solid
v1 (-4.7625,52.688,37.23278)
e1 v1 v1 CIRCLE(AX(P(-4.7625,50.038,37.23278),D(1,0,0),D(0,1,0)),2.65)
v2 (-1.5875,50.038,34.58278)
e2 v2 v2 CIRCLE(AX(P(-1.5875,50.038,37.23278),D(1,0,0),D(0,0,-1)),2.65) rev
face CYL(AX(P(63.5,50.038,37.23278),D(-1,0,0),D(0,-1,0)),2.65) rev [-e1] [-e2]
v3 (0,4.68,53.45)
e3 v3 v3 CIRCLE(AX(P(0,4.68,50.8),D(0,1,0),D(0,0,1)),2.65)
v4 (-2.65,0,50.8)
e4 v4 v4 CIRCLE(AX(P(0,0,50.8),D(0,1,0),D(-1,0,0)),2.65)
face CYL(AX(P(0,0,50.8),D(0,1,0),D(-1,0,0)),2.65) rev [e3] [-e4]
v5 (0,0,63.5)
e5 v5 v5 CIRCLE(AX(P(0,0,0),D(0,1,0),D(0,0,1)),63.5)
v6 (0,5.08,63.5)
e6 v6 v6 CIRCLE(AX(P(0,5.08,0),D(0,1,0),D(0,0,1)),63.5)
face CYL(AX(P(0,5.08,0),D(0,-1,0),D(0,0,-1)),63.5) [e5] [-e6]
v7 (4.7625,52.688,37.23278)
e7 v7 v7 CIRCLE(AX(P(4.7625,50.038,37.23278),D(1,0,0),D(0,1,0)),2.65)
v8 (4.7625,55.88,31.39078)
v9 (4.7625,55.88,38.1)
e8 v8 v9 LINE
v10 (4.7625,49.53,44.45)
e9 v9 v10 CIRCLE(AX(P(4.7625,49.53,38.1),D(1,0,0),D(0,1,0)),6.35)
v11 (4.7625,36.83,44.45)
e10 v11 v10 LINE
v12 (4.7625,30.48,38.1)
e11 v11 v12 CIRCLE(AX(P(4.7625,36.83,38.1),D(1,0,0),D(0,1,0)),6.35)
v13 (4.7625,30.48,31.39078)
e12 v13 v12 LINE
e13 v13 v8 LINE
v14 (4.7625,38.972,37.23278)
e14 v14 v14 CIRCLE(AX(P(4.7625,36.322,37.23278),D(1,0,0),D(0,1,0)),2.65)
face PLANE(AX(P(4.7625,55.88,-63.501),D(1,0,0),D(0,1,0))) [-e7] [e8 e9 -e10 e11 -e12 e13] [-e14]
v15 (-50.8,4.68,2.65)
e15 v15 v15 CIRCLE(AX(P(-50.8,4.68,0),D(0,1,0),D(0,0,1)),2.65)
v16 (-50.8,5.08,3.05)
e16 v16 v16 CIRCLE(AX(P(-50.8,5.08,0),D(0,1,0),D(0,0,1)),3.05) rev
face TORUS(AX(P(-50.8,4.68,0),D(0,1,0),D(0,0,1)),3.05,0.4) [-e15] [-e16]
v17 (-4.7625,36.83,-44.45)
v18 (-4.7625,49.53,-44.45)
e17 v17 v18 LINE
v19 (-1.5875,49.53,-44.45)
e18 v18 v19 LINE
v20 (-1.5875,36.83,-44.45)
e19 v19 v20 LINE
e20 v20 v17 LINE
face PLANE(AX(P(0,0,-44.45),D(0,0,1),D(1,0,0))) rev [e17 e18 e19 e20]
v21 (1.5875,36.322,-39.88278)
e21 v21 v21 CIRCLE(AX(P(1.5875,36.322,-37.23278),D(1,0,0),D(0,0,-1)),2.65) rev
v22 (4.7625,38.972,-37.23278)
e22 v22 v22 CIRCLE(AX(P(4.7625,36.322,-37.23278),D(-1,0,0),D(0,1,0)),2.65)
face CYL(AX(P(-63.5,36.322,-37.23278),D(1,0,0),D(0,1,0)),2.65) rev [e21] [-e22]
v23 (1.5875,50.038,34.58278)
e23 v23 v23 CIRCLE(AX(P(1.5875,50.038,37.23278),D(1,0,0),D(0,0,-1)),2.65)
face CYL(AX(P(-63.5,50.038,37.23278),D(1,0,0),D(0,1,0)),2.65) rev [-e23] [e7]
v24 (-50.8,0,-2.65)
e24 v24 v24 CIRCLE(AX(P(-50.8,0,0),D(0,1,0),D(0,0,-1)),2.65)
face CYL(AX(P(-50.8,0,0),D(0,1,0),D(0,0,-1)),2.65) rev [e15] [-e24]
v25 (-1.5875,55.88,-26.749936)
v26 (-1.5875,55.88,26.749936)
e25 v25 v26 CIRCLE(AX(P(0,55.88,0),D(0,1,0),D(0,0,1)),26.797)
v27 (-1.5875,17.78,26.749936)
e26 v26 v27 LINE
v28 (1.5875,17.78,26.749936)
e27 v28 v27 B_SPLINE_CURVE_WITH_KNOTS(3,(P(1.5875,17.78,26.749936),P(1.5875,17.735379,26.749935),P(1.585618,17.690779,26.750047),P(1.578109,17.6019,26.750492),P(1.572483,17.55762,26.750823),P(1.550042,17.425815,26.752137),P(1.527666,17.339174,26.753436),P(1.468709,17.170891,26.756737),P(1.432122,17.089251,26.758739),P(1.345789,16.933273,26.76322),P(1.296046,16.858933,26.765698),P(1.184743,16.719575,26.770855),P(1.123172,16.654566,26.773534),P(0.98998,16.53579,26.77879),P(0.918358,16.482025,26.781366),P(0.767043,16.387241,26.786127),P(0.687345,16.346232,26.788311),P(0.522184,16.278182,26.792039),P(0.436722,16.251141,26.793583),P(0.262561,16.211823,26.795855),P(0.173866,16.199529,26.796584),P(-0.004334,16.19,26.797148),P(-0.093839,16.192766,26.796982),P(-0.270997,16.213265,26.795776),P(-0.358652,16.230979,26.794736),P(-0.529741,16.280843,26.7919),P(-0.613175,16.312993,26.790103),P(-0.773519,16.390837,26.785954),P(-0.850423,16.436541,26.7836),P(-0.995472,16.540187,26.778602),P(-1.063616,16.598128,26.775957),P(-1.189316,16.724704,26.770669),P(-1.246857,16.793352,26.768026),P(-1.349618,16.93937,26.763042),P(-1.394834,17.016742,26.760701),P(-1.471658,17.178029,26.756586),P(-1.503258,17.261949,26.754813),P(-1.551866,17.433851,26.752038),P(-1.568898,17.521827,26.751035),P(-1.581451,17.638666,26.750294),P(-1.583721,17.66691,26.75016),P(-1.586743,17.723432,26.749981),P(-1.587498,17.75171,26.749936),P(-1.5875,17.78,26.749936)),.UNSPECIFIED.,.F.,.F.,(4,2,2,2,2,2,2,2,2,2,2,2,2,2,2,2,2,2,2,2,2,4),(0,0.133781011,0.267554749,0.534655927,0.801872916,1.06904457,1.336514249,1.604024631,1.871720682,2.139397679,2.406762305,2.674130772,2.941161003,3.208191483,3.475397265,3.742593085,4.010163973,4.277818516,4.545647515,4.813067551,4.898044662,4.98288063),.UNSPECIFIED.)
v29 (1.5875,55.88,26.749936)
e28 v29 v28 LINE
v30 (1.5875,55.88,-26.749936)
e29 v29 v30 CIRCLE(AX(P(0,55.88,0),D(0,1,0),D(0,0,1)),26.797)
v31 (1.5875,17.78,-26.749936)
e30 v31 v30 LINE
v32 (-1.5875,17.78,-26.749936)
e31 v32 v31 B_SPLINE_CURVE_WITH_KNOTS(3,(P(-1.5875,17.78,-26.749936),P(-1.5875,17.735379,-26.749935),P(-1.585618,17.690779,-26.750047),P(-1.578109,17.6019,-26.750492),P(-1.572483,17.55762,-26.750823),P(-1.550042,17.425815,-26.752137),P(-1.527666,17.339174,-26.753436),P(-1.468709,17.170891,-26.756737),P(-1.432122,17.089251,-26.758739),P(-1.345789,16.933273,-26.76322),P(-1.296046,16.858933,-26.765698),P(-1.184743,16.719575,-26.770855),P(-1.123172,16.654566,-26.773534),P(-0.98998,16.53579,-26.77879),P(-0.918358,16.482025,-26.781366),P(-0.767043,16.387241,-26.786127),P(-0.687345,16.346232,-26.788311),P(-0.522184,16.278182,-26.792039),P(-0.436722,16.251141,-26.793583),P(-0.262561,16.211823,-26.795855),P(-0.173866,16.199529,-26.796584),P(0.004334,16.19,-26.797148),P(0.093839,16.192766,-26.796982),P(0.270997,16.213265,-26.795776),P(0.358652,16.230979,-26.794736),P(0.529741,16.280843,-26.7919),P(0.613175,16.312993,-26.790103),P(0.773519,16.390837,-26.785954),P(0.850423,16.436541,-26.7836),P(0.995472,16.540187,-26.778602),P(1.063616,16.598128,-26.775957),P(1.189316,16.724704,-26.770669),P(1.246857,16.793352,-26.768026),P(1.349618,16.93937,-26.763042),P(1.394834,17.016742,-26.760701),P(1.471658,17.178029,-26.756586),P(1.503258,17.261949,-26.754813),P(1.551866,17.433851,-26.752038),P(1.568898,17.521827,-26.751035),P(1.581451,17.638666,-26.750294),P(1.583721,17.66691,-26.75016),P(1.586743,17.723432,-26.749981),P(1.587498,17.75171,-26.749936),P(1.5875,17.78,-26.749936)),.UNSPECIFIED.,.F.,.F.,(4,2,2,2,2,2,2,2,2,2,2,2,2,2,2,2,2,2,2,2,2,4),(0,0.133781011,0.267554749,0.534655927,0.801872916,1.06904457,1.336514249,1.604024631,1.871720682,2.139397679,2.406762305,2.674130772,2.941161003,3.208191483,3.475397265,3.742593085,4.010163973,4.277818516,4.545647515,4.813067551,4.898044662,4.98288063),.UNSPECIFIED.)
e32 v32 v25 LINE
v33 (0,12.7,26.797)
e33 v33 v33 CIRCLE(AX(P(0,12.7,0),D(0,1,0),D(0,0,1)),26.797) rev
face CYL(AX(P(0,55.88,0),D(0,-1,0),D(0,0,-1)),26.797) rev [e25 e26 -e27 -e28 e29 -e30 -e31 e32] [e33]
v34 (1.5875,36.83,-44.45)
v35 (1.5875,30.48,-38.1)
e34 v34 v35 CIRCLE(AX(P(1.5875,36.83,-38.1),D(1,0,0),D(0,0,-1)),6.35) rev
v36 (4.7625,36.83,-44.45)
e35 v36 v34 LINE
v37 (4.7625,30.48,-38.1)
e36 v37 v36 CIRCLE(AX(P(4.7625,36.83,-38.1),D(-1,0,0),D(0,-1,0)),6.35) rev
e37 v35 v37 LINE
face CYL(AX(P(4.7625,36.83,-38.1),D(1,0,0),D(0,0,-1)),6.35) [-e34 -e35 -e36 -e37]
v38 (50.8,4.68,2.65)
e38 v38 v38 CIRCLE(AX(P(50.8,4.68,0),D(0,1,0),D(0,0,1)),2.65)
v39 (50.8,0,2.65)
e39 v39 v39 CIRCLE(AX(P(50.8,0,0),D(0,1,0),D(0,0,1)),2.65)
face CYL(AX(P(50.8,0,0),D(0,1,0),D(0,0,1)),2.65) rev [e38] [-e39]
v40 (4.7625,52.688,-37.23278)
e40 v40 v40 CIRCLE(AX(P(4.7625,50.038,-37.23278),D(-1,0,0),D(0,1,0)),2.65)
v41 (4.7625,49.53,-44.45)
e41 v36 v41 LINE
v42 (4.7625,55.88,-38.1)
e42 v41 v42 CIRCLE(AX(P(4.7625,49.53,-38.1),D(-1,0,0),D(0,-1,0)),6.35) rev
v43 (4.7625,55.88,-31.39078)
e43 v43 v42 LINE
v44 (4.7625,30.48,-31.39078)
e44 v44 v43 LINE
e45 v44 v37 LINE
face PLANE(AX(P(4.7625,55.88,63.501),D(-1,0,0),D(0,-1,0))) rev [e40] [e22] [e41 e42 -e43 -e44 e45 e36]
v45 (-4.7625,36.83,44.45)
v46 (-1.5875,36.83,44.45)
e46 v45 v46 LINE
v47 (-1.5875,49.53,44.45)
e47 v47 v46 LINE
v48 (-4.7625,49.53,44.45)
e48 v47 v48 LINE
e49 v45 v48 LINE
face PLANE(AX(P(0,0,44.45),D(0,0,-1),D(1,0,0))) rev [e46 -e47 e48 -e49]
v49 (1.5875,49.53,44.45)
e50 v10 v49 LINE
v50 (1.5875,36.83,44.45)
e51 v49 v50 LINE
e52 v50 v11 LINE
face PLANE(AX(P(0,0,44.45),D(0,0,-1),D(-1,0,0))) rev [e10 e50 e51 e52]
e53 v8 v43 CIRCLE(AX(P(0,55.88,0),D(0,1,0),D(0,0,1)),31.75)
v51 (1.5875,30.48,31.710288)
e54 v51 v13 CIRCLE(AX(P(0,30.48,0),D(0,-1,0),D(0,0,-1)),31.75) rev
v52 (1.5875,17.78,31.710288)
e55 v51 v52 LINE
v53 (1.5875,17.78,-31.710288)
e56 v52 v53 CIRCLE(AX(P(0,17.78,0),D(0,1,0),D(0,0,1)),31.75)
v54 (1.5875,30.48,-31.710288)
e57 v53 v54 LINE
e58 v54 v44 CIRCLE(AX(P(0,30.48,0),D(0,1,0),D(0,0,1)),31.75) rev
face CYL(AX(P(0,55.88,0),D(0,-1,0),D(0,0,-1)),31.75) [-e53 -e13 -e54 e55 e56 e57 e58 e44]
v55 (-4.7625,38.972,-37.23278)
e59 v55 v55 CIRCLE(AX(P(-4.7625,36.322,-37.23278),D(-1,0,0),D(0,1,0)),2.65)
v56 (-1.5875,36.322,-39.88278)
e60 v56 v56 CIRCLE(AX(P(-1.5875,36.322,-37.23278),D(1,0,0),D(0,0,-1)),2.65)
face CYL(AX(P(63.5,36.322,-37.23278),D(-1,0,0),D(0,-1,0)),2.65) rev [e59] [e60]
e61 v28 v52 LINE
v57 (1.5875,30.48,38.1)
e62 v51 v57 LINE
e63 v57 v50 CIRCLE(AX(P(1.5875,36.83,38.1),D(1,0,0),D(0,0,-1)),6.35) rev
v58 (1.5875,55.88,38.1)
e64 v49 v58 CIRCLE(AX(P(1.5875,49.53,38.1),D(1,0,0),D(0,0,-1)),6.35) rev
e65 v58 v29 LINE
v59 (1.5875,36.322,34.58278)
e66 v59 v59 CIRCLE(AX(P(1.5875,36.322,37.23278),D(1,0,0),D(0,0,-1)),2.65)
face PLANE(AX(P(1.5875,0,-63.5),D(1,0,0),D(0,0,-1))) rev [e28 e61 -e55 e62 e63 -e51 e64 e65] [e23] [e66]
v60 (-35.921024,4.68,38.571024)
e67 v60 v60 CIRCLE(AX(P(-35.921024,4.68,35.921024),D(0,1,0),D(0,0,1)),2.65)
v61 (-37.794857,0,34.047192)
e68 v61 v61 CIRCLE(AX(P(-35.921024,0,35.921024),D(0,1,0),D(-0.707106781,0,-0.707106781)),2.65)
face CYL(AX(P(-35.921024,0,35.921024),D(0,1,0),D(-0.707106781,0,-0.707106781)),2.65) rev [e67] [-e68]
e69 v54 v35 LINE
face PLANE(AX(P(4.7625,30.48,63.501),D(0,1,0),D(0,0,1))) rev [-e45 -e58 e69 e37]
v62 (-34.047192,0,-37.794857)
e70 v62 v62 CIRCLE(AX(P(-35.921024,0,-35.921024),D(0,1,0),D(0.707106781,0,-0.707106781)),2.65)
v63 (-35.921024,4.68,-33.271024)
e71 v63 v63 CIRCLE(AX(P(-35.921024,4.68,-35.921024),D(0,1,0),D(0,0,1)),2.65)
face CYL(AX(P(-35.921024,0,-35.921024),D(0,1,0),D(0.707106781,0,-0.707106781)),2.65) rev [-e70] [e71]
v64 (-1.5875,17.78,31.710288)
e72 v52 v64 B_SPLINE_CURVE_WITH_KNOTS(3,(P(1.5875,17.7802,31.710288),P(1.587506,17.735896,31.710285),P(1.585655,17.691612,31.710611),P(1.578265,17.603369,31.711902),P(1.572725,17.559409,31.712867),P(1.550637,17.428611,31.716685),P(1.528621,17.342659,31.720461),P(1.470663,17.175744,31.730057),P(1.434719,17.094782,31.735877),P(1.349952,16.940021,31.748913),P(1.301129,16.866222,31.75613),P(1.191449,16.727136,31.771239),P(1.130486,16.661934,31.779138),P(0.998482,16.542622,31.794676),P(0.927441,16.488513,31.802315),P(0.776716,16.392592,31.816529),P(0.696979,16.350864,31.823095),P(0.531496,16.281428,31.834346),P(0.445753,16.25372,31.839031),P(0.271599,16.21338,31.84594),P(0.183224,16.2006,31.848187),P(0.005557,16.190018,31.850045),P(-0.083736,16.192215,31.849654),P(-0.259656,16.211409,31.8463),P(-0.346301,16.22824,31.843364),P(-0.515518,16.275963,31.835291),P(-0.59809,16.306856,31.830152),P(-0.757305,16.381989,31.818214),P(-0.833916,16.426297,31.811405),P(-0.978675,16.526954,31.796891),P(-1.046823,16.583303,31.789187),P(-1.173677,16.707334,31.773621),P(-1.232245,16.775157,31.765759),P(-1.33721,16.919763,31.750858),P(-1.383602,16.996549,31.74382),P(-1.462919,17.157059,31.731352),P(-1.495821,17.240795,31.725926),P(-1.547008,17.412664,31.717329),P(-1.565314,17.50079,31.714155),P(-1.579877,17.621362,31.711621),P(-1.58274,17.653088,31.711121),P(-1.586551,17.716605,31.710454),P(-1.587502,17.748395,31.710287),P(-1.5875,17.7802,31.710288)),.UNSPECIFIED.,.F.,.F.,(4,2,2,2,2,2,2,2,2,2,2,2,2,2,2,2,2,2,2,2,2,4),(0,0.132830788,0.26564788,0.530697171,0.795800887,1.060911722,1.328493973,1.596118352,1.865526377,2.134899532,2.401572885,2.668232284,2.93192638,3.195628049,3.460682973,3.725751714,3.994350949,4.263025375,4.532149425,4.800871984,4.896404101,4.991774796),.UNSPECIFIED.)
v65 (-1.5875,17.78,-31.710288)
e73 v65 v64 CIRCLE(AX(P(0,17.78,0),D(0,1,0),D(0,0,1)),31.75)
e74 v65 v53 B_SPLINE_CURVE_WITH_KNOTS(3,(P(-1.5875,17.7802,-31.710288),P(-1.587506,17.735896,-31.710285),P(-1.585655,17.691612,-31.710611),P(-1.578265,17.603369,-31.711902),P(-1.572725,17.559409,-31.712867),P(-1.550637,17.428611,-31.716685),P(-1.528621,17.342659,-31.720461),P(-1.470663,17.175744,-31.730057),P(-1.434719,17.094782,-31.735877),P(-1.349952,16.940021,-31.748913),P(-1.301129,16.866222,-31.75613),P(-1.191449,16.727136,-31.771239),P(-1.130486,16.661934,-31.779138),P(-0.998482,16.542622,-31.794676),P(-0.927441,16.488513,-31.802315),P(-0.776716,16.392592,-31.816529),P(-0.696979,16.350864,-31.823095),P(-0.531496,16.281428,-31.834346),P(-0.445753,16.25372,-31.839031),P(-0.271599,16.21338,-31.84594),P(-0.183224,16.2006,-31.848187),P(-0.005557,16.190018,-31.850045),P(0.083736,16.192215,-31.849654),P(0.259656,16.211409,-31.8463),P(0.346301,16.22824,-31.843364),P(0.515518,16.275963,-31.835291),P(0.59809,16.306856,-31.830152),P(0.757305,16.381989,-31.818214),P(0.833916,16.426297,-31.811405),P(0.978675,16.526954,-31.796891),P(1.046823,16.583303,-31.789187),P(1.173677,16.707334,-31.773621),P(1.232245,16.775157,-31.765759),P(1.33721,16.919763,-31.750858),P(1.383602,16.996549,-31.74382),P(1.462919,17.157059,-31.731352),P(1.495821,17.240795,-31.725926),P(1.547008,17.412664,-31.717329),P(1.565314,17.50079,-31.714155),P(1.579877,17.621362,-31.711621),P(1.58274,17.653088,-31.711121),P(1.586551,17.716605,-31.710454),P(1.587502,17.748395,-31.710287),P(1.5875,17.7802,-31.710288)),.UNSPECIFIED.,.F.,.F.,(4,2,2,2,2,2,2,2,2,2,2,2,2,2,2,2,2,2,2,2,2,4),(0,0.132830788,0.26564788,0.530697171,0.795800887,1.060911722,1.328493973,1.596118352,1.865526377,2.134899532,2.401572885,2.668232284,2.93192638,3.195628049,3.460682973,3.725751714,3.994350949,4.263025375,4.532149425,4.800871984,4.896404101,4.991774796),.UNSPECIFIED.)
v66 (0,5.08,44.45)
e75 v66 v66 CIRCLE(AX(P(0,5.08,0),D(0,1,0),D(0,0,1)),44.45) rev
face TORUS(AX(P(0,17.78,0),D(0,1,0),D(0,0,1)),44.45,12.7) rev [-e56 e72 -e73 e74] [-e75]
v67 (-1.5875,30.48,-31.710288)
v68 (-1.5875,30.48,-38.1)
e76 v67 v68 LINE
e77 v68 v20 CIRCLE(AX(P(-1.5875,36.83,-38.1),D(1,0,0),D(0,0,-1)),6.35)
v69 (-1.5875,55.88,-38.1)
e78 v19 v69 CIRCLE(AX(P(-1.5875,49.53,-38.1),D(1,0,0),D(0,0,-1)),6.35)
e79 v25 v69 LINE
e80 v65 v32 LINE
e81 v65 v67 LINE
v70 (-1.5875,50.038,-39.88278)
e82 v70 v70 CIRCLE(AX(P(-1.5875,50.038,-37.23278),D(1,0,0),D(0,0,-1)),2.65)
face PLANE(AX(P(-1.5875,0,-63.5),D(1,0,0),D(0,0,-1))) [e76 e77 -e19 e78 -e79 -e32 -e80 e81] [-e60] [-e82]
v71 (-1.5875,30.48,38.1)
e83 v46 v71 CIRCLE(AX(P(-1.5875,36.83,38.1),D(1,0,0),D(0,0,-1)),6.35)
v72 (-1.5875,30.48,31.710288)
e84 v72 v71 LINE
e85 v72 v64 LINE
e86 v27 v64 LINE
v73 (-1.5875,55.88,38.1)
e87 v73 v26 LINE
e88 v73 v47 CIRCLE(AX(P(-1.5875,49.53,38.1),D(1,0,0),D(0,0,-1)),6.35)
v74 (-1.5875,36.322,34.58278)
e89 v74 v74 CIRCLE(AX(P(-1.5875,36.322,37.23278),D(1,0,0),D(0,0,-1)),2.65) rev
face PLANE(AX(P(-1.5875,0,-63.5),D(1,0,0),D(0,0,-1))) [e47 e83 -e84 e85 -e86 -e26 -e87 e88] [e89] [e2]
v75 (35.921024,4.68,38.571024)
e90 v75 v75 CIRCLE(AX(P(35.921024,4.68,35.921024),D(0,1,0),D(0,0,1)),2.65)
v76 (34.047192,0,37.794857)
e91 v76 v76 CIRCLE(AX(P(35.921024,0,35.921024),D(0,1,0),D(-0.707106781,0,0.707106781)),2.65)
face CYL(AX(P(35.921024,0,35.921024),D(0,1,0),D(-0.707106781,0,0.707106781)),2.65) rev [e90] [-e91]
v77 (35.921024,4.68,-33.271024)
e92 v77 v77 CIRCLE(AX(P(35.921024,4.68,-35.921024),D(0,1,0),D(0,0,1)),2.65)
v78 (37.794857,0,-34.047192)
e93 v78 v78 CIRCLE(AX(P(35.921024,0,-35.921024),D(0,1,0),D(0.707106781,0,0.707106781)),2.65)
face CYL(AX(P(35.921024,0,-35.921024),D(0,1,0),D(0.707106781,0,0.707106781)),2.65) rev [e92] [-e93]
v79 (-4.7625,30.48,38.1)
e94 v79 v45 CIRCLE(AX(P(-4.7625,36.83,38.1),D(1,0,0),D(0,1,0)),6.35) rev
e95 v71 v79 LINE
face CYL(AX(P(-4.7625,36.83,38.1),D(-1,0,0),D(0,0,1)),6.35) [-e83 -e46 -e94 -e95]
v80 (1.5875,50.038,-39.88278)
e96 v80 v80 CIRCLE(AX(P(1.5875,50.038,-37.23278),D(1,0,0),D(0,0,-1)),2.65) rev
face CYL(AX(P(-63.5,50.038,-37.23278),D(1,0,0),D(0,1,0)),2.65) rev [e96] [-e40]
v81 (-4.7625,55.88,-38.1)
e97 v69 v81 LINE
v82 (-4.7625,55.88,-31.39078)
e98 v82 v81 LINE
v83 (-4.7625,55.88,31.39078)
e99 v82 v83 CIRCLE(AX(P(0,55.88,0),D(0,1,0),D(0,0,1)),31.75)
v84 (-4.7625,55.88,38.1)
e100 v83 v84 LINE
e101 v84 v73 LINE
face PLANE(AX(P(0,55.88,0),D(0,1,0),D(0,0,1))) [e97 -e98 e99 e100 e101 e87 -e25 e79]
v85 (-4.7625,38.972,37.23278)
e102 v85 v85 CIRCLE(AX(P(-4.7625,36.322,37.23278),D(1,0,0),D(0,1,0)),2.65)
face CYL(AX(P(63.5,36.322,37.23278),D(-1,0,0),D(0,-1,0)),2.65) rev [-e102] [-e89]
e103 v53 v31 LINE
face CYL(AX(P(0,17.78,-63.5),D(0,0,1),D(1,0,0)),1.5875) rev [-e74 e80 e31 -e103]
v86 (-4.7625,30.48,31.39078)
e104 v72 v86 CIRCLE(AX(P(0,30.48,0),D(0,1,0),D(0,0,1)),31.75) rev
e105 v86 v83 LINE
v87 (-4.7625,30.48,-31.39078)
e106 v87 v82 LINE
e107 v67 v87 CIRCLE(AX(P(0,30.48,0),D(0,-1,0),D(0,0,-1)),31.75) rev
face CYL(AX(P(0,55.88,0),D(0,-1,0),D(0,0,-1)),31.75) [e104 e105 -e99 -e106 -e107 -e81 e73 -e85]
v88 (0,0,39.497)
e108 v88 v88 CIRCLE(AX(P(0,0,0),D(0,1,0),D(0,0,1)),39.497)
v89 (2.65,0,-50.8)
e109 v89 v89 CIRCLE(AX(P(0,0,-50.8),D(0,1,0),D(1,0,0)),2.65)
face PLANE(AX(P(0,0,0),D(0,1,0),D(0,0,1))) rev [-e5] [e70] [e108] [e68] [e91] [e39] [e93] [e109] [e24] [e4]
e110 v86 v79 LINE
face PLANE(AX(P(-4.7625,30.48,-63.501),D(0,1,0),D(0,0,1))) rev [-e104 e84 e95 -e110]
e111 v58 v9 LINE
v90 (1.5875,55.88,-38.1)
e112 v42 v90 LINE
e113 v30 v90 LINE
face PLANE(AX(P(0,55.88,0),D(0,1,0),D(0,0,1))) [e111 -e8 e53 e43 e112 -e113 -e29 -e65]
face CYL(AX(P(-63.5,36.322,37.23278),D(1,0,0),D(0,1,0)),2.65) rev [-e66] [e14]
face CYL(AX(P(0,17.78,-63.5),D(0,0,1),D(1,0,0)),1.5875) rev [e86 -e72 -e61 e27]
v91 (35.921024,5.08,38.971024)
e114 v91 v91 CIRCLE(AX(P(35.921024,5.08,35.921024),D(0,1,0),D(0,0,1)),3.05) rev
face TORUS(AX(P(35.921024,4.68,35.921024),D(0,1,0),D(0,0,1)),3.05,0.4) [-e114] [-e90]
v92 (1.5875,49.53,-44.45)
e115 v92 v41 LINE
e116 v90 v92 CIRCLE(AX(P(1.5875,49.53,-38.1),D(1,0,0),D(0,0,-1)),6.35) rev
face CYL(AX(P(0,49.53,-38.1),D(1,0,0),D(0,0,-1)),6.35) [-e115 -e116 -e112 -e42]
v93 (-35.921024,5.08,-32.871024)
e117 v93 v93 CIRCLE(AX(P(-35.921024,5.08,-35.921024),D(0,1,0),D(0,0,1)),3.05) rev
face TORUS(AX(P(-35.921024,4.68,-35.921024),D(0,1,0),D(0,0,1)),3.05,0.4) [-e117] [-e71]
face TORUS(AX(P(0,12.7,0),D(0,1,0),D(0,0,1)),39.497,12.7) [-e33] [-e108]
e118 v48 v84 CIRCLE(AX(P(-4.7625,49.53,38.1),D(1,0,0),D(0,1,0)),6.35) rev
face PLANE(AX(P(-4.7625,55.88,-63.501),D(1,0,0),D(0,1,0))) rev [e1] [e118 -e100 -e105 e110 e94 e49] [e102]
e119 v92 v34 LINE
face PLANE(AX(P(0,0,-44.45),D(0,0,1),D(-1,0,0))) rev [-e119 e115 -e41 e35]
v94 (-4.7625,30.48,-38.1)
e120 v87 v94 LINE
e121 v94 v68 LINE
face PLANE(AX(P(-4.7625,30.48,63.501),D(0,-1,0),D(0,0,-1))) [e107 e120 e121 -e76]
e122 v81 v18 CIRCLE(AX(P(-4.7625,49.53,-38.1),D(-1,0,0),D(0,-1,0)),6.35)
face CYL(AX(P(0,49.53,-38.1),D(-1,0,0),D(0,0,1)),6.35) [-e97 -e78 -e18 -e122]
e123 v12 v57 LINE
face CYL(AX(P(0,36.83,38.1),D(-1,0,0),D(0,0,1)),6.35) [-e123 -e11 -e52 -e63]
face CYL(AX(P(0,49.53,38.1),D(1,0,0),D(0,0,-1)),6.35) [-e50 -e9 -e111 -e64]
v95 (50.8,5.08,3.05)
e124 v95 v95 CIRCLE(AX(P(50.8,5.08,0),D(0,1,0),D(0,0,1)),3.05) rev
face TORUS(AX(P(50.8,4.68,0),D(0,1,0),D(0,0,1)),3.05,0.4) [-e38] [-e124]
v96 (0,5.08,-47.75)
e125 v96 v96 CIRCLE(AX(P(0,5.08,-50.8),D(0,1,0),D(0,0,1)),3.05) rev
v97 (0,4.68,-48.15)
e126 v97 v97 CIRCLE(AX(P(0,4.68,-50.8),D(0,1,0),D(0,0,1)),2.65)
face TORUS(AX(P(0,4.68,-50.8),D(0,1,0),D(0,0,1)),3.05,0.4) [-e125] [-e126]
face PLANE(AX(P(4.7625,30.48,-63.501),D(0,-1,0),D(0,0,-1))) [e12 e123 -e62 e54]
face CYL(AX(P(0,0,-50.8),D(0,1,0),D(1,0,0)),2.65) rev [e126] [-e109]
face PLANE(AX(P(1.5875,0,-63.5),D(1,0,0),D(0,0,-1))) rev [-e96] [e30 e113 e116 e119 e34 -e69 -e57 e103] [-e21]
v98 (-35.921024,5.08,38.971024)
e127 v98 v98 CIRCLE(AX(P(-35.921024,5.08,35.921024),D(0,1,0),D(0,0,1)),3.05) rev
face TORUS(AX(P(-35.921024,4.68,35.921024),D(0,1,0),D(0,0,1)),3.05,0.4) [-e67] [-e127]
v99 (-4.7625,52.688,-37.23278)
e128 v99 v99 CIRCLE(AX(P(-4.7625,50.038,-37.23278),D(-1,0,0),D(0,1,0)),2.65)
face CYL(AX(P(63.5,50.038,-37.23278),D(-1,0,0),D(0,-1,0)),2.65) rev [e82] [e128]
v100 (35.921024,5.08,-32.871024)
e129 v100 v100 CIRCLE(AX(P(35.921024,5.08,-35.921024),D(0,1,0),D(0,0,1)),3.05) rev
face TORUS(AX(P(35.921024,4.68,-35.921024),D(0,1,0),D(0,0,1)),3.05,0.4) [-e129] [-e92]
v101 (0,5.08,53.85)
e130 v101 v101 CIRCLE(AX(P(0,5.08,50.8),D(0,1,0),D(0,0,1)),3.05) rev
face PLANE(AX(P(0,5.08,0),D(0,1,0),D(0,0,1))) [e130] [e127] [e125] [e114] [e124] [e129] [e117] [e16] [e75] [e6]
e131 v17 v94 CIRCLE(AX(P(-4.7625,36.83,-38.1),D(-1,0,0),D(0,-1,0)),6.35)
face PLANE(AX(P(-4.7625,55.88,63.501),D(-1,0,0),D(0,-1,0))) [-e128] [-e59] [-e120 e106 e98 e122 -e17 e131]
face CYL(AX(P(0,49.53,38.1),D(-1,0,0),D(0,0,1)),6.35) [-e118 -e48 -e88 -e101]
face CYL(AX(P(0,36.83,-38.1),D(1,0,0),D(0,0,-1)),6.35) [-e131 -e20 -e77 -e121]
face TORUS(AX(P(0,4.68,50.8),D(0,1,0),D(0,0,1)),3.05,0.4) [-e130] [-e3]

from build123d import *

# Parameters (mm, degrees)
SKETCH1_R                = 63.5
BOSS_EXTRUDE1_DEPTH      = 5.08
SKETCH2_R                = 31.75
SKETCH2_R_2              = 26.797
BOSS_EXTRUDE2_DEPTH      = 50.8
SKETCH3_R                = 26.797
CUT_EXTRUDE1_DEPTH       = 104.175287739
FILLET2_R                = 12.7
FILLET3_R                = 12.7
CUT_EXTRUDE2_DEPTH       = 106.768967266
CUT_EXTRUDE2_DEPTH_BACK  = 106.768967266
SKETCH5_W                = 3.175
SKETCH5_H                = 76.2
SKETCH6_R                = 2.65
CUT_EXTRUDE3_DEPTH       = 104.175287911
CIRPATTERN1_COUNT        = 8
FILLET4_R                = 0.4
BOSS_EXTRUDE3_REACH      = 139.142
BOSS_EXTRUDE3_END_RADIUS = 31.75
SKETCH9_W                = 3.175
SKETCH9_H                = 25.4
FILLET5_R                = 6.35
SKETCH11_R               = 2.65
CUT_EXTRUDE4_DEPTH       = 109.694955466
FILLET5_OF_MIRROR8_R     = 6.35


# Read off the part's stored shape, not the designer's step: Mirror9
with BuildPart() as part:
    # Sketch1 → Boss-Extrude1 (new body)
    with BuildSketch(Plane(origin=(0, 0, 0), x_dir=(1, 0, 0), z_dir=(0, 1, 0))):
        with Locations(Location((0, 0, 0), (0, 0, 270))):
            Circle(SKETCH1_R)
    extrude(amount=BOSS_EXTRUDE1_DEPTH)

    # Sketch2 → Boss-Extrude2 (add)
    with BuildSketch(Plane(origin=(0, 5.08, 0), x_dir=(1, 0, 0), z_dir=(0, 1, 0))):
        with Locations(Location((0, 0, 0), (0, 0, 270))):
            Circle(SKETCH2_R)
        with Locations(Location((0, 0, 0), (0, 0, 270))):
            Circle(SKETCH2_R_2, mode=Mode.SUBTRACT)
    extrude(amount=BOSS_EXTRUDE2_DEPTH)

    # Sketch3 → Cut-Extrude1 (cut, through all)
    with BuildSketch(Plane(origin=(0, 5.08, 0), x_dir=(1, 0, 0), z_dir=(0, 1, 0))):
        with Locations(Location((0, 0, 0), (0, 0, 270))):
            Circle(SKETCH3_R)
    extrude(amount=-CUT_EXTRUDE1_DEPTH, mode=Mode.SUBTRACT)

    # Fillet2
    fillet2_edges = [part.edges().sort_by_distance(p)[0] for p in [
        (0, 5.08, -31.75),
    ]]
    fillet(fillet2_edges, radius=FILLET2_R)

    # Fillet3
    fillet3_edges = [part.edges().sort_by_distance(p)[0] for p in [
        (0, 0, -26.797),
    ]]
    fillet(fillet3_edges, radius=FILLET3_R)

    # Sketch5 → Cut-Extrude2 (cut, two sides: drawn at the far end of the back side and taken through both)
    with BuildSketch(Plane.XY.offset(-CUT_EXTRUDE2_DEPTH_BACK)):
        with Locations((0, 55.88)):
            Rectangle(SKETCH5_W, SKETCH5_H)
        with BuildLine():
            Line((1.5875, 17.78), (-1.5875, 17.78))
            ThreePointArc((-1.5875, 17.78), (0, 16.1925), (1.5875, 17.78))
        make_face()
        with BuildLine():
            ThreePointArc((1.5875, 93.98), (0, 95.5675), (-1.5875, 93.98))
            Line((-1.5875, 93.98), (1.5875, 93.98))
        make_face()
    extrude(amount=CUT_EXTRUDE2_DEPTH + CUT_EXTRUDE2_DEPTH_BACK, mode=Mode.SUBTRACT)

    # Sketch6 → Cut-Extrude3 (cut, symmetric)
    with BuildSketch(Plane(origin=(0, 5.08, 0), x_dir=(1, 0, 0), z_dir=(0, 1, 0))):
        with Locations(Location((50.8, 0, 0), (0, 0, 270))):
            Circle(SKETCH6_R)
    cut_extrude3 = extrude(amount=CUT_EXTRUDE3_DEPTH, both=True, mode=Mode.SUBTRACT)

    # CirPattern1: Cut-Extrude3 ×8 about axis
    cirpattern1_axis = Axis((0, 0, 0), (0, 1, 0))
    for i in range(1, CIRPATTERN1_COUNT):
        add(cut_extrude3.rotate(cirpattern1_axis, i * 360 / CIRPATTERN1_COUNT), mode=Mode.SUBTRACT)

    # Fillet4
    fillet4_edges = [part.edges().sort_by_distance(p)[0] for p in [
        (50.8, 5.08, -2.65),
        (2.65, 5.08, 50.8),
        (-34.047191514, 5.08, 37.794857454),
        (-50.8, 5.08, 2.65),
        (-37.794857454, 5.08, -34.047191514),
        (-2.65, 5.08, -50.8),
        (34.047191514, 5.08, -37.794857454),
        (37.794857454, 5.08, 34.047191514),
    ]]
    fillet(fillet4_edges, radius=FILLET4_R)

    # Boss-Extrude3: up to this cylinder (the profile starts outside it)
    boss_extrude3_end = Plane(origin=(0, 43.18, 0), z_dir=(0, -1, 0)) * Cylinder(BOSS_EXTRUDE3_END_RADIUS, 342.784, mode=Mode.PRIVATE)
    # Sketch9 → Boss-Extrude3 (add, up to the surface)
    with BuildSketch(Plane.XY.offset(44.45), mode=Mode.PRIVATE) as boss_extrude3_sk1:
        with Locations((3.175, 43.18)):
            Rectangle(SKETCH9_W, SKETCH9_H)
    boss_extrude3_tool1 = extrude(boss_extrude3_sk1.sketch, amount=-BOSS_EXTRUDE3_REACH, mode=Mode.PRIVATE) - boss_extrude3_end
    boss_extrude3 = boss_extrude3_tool1.solids().sort_by_distance((3.175, 43.18, 44.45))[0]
    add(boss_extrude3)

    # Fillet5
    fillet5_edges = [part.edges().sort_by_distance(p)[0] for p in [
        (3.175, 30.48, 44.45),
        (3.175, 55.88, 44.45),
    ]]
    fillet(fillet5_edges, radius=FILLET5_R)

    # Sketch11 → Cut-Extrude4 (cut, through all)
    with BuildSketch(Plane(origin=(4.7625, 0, 0), x_dir=(0, 0, -1), z_dir=(1, 0, 0))):
        with Locations(Location((-37.232780394, 50.038, 0), (0, 0, 90))):
            Circle(SKETCH11_R)
        with Locations(Location((-37.232780394, 36.322, 0), (0, 0, 90))):
            Circle(SKETCH11_R)
    cut_extrude4 = extrude(amount=-CUT_EXTRUDE4_DEPTH, mode=Mode.SUBTRACT)

    # Mirror8: Boss-Extrude3, Cut-Extrude4 across plane
    add(boss_extrude3.mirror(Plane.XY))
    add(cut_extrude4.mirror(Plane.XY), mode=Mode.SUBTRACT)

    # Fillet5 of Mirror8
    fillet5_of_mirror8_edges = [part.edges().sort_by_distance(p)[0] for p in [
        (3.175, 30.48, -44.45),
        (3.175, 55.88, -44.45),
    ]]
    fillet(fillet5_of_mirror8_edges, radius=FILLET5_OF_MIRROR8_R)

    # Mirror9: part across plane


with BuildPart() as part_1:
    add(part.part)
    add(part.part.mirror(Plane(origin=(0, 0, 0), x_dir=(0, 0, 1), z_dir=(1, 0, 0))))


solid = part_1.part
